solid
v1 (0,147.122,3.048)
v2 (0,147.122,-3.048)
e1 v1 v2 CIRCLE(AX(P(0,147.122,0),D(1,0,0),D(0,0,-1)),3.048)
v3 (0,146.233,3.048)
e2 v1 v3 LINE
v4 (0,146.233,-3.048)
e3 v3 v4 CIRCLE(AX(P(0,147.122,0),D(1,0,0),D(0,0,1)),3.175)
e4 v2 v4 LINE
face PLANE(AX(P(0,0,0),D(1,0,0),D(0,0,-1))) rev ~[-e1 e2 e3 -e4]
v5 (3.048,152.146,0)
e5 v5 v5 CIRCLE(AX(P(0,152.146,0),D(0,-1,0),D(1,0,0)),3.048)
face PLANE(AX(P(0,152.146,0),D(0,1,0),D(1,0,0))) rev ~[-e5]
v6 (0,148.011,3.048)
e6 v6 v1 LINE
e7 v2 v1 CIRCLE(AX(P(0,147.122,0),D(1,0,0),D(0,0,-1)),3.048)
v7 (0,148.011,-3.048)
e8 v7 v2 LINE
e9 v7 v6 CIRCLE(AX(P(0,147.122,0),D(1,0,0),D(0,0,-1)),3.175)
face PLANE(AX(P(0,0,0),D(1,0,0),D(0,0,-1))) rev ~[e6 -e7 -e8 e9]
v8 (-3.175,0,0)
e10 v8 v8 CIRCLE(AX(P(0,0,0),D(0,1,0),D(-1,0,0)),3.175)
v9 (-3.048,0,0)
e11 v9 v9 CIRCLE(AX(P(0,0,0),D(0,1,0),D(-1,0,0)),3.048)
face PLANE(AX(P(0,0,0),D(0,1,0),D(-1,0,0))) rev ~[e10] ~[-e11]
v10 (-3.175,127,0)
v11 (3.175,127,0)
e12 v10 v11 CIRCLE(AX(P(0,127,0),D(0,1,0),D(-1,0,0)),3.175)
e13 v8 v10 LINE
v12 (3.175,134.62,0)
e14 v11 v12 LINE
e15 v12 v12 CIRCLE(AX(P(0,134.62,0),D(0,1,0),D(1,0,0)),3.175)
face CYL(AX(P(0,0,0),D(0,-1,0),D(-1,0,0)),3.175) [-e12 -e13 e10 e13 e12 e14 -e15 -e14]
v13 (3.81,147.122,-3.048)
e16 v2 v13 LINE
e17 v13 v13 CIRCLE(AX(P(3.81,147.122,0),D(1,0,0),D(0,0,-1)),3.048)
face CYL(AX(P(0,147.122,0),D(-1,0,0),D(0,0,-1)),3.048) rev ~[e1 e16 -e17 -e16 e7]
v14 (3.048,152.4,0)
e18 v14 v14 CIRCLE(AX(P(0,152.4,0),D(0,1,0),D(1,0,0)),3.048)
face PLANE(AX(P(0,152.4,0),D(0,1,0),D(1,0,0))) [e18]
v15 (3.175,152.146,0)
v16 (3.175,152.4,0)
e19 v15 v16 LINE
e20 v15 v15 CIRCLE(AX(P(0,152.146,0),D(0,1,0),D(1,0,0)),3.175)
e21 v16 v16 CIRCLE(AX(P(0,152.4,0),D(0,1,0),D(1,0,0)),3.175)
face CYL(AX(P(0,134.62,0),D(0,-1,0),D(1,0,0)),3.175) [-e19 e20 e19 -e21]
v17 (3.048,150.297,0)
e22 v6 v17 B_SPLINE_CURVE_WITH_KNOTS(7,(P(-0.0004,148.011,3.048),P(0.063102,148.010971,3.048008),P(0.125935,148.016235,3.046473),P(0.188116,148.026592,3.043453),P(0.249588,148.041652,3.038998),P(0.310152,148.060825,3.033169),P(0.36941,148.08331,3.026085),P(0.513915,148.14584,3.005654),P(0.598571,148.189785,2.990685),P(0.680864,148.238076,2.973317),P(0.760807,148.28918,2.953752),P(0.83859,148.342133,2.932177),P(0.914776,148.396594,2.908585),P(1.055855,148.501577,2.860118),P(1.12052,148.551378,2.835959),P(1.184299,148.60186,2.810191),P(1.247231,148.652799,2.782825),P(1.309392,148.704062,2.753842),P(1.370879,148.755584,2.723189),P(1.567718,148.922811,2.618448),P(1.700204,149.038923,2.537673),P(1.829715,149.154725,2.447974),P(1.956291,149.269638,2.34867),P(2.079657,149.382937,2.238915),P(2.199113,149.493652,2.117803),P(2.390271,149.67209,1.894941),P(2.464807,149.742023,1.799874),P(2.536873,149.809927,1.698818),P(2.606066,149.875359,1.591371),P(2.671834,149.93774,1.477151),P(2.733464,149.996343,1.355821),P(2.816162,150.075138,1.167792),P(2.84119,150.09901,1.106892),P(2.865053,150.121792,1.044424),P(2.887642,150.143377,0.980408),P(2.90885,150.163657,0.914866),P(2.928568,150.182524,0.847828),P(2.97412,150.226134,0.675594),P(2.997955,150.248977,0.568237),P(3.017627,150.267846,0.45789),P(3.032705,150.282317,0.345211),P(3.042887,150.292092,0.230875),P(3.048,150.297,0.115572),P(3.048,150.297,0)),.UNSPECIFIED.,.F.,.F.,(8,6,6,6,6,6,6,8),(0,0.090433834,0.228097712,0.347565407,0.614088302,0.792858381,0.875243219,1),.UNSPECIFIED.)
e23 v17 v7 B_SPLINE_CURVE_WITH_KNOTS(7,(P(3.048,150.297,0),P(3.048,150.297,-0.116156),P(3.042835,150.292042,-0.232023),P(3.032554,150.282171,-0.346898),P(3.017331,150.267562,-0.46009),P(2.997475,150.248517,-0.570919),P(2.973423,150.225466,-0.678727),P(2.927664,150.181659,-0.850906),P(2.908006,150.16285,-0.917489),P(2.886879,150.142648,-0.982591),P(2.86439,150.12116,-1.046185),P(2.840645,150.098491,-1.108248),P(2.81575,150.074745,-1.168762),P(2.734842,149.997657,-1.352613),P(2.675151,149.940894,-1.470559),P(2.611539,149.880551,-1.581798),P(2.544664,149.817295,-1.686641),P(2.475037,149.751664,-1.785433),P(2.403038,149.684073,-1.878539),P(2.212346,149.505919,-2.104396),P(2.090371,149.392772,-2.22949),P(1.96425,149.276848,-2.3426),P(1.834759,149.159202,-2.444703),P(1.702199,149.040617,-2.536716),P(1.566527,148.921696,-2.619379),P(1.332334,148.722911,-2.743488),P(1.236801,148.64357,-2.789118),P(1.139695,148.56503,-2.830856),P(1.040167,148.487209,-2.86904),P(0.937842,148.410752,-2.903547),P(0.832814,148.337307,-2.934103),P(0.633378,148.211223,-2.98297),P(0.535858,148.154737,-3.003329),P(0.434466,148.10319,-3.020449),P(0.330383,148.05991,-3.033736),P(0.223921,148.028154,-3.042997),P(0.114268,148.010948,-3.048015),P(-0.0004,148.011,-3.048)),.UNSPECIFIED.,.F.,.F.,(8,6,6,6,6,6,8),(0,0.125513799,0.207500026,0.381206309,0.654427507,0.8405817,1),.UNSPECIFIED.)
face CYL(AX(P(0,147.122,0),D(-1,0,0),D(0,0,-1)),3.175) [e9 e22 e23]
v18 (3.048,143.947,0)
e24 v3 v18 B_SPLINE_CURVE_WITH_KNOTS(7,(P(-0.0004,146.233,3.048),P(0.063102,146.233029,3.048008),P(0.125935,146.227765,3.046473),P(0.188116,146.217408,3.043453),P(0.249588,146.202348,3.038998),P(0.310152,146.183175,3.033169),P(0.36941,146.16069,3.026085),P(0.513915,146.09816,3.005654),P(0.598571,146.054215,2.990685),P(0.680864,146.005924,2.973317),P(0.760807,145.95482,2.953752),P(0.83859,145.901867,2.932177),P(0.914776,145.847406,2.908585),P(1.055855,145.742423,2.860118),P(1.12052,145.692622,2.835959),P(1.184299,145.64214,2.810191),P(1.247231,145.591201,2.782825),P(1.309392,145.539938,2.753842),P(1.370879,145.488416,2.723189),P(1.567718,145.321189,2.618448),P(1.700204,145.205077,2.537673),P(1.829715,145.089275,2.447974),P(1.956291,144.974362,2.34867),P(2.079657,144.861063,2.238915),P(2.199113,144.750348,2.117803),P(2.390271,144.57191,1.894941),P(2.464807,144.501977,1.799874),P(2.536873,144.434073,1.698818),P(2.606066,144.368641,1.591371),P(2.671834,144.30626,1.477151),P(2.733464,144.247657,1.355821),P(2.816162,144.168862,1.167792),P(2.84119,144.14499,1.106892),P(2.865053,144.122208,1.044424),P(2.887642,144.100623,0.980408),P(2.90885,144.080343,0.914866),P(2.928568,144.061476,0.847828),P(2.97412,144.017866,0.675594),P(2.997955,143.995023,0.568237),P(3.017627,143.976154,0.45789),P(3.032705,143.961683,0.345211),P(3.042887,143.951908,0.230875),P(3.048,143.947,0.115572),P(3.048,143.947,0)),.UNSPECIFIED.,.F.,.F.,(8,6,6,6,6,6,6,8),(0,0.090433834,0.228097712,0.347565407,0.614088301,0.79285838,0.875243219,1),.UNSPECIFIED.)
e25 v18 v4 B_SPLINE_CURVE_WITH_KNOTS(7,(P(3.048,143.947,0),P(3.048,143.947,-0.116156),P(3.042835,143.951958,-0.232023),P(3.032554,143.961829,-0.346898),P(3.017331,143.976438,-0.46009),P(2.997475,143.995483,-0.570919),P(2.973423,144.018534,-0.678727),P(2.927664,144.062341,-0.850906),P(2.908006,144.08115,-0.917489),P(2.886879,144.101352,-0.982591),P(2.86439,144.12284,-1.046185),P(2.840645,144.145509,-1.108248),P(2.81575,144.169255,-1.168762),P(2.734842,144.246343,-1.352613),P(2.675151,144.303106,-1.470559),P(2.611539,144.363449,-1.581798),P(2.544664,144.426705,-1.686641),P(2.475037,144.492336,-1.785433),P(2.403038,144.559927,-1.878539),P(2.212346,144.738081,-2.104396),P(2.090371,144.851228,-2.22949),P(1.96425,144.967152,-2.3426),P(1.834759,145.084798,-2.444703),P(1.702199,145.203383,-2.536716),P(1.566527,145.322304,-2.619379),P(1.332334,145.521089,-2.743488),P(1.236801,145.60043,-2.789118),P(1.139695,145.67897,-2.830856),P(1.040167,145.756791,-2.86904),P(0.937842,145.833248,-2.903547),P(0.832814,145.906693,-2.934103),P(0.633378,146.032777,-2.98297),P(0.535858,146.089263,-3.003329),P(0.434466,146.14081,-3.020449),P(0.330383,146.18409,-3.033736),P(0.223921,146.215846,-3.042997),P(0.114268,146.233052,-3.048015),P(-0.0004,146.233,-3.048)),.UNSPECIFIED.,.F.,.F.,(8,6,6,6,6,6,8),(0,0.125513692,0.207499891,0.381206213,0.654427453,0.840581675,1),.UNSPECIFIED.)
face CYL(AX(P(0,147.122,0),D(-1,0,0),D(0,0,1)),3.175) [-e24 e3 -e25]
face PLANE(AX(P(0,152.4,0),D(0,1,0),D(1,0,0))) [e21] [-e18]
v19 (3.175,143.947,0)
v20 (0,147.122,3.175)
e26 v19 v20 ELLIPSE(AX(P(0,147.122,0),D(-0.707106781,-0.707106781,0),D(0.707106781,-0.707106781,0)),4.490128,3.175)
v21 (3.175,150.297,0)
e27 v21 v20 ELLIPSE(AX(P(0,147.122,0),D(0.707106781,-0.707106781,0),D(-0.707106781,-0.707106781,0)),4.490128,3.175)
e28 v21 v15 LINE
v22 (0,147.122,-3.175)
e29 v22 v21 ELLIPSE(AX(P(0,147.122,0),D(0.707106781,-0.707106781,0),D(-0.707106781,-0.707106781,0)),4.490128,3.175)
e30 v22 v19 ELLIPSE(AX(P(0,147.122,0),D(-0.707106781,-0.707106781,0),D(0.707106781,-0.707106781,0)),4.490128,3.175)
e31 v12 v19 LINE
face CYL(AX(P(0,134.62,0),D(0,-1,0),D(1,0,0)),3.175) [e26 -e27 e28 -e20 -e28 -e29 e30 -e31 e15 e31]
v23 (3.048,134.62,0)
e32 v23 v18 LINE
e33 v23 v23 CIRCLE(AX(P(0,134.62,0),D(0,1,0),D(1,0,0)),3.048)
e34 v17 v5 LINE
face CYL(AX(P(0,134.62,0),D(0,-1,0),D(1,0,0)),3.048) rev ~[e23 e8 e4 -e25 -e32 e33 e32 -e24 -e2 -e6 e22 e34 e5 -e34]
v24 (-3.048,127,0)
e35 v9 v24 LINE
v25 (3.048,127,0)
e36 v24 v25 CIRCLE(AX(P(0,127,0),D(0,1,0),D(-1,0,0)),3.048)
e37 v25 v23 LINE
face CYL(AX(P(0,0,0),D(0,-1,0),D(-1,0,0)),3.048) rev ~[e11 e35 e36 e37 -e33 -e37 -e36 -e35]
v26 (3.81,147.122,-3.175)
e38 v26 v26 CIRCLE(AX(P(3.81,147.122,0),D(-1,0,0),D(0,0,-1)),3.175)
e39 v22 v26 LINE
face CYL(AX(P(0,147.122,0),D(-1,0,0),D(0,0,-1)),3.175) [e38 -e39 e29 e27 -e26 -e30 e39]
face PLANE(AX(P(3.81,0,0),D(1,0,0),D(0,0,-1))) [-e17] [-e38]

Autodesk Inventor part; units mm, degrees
ref_plane "XZ Plane" through (0, 0, 0) normal (0, 1, 0) x (-1, 0, 0)
ref_plane "XY Plane" through (0, 0, 0) normal (0, 0, 1) x (1, 0, 0)
sketch "Sketch1" plane through (0, 0, 0) normal (0, 1, 0) x (-1, 0, 0)
  circle A0 centre (0, 0) radius 3.175
  circle A1 centre (0, 0) radius 3.048
  dimension "d0" = 6.35
  dimension "d1" = 6.096
extrude "Extrusion1" add sketch "Sketch1" along normal blind 127
sketch "Sketch8" plane through (0, 127, 0) normal (0, 1, 0) x (1, 0, 0)
  circle A0 centre (0, 0) radius 3.175 projected
  circle A1 centre (0, 0) radius 3.048 projected
extrude "Extrusion2" add sketch "Sketch8" along normal blind 7.62
sketch "Sketch16" plane through (0, 134.62, 0) normal (0, 1, 0) x (1, 0, 0)
  circle A0 centre (0, 0) radius 3.175 projected
  circle A1 centre (0, 0) radius 3.048 projected
extrude "Extrusion3" add sketch "Sketch16" along normal blind 17.78
sketch "Sketch17" plane through (0, 152.4, 0) normal (0, 1, 0) x (1, 0, 0)
  circle A0 centre (0, 0) radius 3.175 projected
extrude "Extrusion4" add sketch "Sketch17" against normal blind 0.254
ref_plane "Work Plane2" through (12.7, 0, 0) normal (1, 0, 0) x (0, 1, 0)
sketch "Sketch18" plane through (12.7, 0, 0) normal (1, 0, 0) x (0, 1, 0)
  circle A0 centre (147.122, 0) radius 3.175
  point P0 (0, 0)
  dimension "d58" = 6.35
extrude "Extrusion5" cut sketch "Sketch18" against normal blind 12.7
sketch "Sketch19" plane through (0, 0, 0) normal (1, 0, 0) x (0, 0, -1)
  arc A0 (-3.175, 147.122) -> (3.175, 147.122) centre (0, 147.122) ccw projected
  circle A1 centre (0, 147.122) radius 3.175
  circle A2 centre (0, 147.122) radius 3.048
  point P0 (0, 0)
  dimension "d61" = 6.096
extrude "Extrusion6" add sketch "Sketch19" along normal blind 3.81
properties part number "waterpip2e"
